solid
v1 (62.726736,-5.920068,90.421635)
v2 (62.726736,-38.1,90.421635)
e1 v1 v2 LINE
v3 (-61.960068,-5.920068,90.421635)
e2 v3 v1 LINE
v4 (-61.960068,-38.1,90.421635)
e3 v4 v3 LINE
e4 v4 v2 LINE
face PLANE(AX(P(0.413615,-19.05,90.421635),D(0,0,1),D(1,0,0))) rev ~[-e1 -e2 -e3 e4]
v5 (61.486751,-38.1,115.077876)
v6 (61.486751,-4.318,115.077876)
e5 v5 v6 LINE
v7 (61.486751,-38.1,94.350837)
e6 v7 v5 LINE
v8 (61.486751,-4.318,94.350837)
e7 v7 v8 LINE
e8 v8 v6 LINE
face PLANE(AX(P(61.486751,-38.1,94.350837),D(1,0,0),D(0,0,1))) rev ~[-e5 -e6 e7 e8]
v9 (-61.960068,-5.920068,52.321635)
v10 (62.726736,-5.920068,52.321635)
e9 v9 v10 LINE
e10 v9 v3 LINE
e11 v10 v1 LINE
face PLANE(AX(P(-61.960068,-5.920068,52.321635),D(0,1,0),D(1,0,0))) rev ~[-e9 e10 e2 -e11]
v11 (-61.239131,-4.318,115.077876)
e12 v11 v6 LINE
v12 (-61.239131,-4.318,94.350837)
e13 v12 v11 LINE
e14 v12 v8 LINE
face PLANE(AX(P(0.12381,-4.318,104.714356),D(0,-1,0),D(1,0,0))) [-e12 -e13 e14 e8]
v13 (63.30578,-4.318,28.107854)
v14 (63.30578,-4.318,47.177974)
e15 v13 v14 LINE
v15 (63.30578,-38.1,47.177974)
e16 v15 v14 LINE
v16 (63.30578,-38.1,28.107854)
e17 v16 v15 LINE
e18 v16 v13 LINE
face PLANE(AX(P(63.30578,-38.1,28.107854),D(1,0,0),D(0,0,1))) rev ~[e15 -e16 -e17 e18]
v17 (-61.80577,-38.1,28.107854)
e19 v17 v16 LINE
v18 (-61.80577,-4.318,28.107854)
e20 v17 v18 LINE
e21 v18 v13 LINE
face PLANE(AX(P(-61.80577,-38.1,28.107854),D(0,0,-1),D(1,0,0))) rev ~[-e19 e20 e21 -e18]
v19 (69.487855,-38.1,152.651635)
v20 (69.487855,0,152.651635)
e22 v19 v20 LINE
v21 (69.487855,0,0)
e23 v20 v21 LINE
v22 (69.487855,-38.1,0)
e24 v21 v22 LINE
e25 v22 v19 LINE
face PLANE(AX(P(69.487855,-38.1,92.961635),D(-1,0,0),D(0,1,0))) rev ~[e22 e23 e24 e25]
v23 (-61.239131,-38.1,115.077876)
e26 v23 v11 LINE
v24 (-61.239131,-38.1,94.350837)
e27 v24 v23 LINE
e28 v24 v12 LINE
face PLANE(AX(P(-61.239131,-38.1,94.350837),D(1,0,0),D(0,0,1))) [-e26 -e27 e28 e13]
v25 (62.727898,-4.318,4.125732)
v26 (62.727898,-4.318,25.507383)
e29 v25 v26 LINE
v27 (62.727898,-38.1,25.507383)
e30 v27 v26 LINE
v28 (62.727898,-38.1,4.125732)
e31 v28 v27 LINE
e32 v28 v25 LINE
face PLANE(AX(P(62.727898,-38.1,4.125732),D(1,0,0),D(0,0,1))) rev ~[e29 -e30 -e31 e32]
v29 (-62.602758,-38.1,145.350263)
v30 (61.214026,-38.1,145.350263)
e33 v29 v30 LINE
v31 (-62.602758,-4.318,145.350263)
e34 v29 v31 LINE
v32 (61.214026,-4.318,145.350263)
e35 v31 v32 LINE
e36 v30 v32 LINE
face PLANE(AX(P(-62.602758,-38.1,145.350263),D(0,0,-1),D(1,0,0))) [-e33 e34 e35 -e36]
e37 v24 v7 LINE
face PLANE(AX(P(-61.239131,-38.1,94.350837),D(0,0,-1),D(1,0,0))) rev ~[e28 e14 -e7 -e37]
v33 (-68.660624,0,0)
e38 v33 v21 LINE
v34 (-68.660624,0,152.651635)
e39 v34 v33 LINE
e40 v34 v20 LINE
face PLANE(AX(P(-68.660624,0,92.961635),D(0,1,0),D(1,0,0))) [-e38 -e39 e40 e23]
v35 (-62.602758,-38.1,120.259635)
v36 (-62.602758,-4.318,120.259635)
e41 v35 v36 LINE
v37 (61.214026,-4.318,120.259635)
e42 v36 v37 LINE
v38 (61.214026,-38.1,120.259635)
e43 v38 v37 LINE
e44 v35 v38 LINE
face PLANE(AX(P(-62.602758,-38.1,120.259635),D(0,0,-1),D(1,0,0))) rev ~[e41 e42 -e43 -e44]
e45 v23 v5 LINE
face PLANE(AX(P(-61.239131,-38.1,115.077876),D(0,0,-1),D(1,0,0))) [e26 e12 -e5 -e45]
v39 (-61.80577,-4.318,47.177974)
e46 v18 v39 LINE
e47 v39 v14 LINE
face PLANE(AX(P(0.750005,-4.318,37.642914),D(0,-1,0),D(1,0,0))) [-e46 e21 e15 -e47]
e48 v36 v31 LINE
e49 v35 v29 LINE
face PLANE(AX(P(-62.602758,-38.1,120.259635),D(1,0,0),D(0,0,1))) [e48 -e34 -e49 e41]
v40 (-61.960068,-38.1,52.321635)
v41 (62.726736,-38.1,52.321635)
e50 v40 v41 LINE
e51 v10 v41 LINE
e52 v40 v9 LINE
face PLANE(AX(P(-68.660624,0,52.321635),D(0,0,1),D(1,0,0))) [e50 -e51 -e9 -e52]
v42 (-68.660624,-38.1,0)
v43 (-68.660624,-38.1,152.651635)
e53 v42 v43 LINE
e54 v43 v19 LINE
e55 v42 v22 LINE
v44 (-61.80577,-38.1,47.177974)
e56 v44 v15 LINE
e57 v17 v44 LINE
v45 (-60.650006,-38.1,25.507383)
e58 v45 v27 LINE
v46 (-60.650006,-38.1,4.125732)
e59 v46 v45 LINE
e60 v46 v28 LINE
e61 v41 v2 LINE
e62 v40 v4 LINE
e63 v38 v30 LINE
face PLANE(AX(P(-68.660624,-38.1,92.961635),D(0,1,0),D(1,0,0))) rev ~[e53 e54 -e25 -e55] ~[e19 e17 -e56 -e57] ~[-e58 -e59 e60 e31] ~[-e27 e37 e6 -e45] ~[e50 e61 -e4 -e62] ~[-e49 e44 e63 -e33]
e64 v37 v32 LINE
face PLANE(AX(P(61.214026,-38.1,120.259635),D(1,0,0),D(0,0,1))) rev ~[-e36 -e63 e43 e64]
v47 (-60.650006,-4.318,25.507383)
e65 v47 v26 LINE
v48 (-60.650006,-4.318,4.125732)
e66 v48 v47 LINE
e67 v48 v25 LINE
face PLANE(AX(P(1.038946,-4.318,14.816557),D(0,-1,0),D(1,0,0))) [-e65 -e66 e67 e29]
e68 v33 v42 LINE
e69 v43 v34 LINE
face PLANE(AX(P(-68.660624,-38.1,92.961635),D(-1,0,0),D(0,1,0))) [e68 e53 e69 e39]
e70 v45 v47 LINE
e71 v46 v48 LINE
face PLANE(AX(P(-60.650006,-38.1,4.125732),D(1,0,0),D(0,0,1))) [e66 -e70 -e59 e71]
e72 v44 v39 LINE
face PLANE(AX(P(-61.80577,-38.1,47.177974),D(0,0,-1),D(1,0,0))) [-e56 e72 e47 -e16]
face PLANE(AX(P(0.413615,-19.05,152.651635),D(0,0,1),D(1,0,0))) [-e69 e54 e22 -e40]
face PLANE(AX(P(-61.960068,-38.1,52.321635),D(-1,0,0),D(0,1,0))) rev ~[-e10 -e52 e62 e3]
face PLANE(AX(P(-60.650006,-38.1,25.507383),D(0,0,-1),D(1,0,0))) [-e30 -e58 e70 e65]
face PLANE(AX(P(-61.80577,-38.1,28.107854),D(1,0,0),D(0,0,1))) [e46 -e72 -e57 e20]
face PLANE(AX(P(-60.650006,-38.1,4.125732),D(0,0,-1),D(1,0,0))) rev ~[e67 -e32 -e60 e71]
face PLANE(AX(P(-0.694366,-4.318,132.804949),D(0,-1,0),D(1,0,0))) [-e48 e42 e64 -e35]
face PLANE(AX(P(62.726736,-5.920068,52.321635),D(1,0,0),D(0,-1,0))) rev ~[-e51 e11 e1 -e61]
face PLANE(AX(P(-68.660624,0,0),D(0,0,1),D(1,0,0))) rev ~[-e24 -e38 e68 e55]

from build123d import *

# Parameters (mm, degrees)
F0_W      = 138.1484791636
F0_H      = 52.3216351867
F1_DEPTH  = 38.1
F2_W      = 124.6868036687
F2_H      = 5.9200678952
F3_DEPTH  = 38.1
F4_W      = 138.1484791636
F4_H      = 38.1
F5_DEPTH  = 2.54
F6_W      = 138.1484791636
F6_H      = 38.1
F7_DEPTH  = 59.69
F8_W      = 122.7258816361
F8_H      = 20.7270383835
F12_DEPTH = 33.782
F9_W      = 123.8167844713
F9_H      = 25.0906273723
F13_DEPTH = 33.782
F10_W     = 125.1115500927
F10_H     = 19.0701205283
F14_DEPTH = 33.782
F11_W     = 123.3779042959
F11_H     = 21.381651517
F15_DEPTH = 33.782


# Not quite as in the source:
# - a feature names something its author has since deleted; it is built from what else it names


with BuildPart() as f1:
    # F0 (on Front) → F1 (new body)
    with BuildSketch(Plane.XZ):
        with Locations((0.4136152565, 26.1608175933)):
            Rectangle(F0_W, F0_H)
    extrude(amount=F1_DEPTH)

    # F2 (on face) → F3 (join)
    with BuildSketch(Plane.XY.offset(52.3216351867)):
        Polygon((-61.9600676, 0), (-68.6606243253, 0), (-68.6606243253, -38.1), (-61.9600676, -38.1), (-61.9600676, -5.9200678952), align=None)
        with Locations((0.3833342344, -2.9600339476)):
            Rectangle(F2_W, F2_H)
        Polygon((69.4878548384, 0), (62.7267360687, 0), (62.7267360687, -5.9200678952), (62.7267360687, -38.1), (69.4878548384, -38.1), align=None)
    extrude(amount=F3_DEPTH)

    # F4 (on face) → F5 (join)
    with BuildSketch(Plane.XY.offset(90.4216351867)):
        with Locations((0.4136152565, -19.05)):
            Rectangle(F4_W, F4_H)
    extrude(amount=F5_DEPTH)

    # F6 (on face) → F7 (join)
    with BuildSketch(Plane.XY.offset(92.9616351867)):
        with Locations((0.4136152565, -19.05)):
            Rectangle(F6_W, F6_H)
    extrude(amount=F7_DEPTH)

    # F8 (on face) → F12 (cut)
    with BuildSketch(Plane.XZ.offset(38.1)):
        with Locations((0.1238100231, 104.7143563628)):
            Rectangle(F8_W, F8_H)
    extrude(amount=-F12_DEPTH, mode=Mode.SUBTRACT)

    # F9 (on face) → F13 (cut)
    with BuildSketch(Plane.XZ.offset(38.1)):
        with Locations((-0.694366172, 132.8049488366)):
            Rectangle(F9_W, F9_H)
    extrude(amount=-F13_DEPTH, mode=Mode.SUBTRACT)

    # F10 (on face) → F14 (cut)
    with BuildSketch(Plane.XZ.offset(38.1)):
        with Locations((0.7500052452, 37.6429138705)):
            Rectangle(F10_W, F10_H)
    extrude(amount=-F14_DEPTH, mode=Mode.SUBTRACT)

    # F11 (on face) → F15 (cut)
    with BuildSketch(Plane.XZ.offset(38.1)):
        with Locations((1.0389462113, 14.81655729)):
            Rectangle(F11_W, F11_H)
    extrude(amount=-F15_DEPTH, mode=Mode.SUBTRACT)


solid = f1.part
